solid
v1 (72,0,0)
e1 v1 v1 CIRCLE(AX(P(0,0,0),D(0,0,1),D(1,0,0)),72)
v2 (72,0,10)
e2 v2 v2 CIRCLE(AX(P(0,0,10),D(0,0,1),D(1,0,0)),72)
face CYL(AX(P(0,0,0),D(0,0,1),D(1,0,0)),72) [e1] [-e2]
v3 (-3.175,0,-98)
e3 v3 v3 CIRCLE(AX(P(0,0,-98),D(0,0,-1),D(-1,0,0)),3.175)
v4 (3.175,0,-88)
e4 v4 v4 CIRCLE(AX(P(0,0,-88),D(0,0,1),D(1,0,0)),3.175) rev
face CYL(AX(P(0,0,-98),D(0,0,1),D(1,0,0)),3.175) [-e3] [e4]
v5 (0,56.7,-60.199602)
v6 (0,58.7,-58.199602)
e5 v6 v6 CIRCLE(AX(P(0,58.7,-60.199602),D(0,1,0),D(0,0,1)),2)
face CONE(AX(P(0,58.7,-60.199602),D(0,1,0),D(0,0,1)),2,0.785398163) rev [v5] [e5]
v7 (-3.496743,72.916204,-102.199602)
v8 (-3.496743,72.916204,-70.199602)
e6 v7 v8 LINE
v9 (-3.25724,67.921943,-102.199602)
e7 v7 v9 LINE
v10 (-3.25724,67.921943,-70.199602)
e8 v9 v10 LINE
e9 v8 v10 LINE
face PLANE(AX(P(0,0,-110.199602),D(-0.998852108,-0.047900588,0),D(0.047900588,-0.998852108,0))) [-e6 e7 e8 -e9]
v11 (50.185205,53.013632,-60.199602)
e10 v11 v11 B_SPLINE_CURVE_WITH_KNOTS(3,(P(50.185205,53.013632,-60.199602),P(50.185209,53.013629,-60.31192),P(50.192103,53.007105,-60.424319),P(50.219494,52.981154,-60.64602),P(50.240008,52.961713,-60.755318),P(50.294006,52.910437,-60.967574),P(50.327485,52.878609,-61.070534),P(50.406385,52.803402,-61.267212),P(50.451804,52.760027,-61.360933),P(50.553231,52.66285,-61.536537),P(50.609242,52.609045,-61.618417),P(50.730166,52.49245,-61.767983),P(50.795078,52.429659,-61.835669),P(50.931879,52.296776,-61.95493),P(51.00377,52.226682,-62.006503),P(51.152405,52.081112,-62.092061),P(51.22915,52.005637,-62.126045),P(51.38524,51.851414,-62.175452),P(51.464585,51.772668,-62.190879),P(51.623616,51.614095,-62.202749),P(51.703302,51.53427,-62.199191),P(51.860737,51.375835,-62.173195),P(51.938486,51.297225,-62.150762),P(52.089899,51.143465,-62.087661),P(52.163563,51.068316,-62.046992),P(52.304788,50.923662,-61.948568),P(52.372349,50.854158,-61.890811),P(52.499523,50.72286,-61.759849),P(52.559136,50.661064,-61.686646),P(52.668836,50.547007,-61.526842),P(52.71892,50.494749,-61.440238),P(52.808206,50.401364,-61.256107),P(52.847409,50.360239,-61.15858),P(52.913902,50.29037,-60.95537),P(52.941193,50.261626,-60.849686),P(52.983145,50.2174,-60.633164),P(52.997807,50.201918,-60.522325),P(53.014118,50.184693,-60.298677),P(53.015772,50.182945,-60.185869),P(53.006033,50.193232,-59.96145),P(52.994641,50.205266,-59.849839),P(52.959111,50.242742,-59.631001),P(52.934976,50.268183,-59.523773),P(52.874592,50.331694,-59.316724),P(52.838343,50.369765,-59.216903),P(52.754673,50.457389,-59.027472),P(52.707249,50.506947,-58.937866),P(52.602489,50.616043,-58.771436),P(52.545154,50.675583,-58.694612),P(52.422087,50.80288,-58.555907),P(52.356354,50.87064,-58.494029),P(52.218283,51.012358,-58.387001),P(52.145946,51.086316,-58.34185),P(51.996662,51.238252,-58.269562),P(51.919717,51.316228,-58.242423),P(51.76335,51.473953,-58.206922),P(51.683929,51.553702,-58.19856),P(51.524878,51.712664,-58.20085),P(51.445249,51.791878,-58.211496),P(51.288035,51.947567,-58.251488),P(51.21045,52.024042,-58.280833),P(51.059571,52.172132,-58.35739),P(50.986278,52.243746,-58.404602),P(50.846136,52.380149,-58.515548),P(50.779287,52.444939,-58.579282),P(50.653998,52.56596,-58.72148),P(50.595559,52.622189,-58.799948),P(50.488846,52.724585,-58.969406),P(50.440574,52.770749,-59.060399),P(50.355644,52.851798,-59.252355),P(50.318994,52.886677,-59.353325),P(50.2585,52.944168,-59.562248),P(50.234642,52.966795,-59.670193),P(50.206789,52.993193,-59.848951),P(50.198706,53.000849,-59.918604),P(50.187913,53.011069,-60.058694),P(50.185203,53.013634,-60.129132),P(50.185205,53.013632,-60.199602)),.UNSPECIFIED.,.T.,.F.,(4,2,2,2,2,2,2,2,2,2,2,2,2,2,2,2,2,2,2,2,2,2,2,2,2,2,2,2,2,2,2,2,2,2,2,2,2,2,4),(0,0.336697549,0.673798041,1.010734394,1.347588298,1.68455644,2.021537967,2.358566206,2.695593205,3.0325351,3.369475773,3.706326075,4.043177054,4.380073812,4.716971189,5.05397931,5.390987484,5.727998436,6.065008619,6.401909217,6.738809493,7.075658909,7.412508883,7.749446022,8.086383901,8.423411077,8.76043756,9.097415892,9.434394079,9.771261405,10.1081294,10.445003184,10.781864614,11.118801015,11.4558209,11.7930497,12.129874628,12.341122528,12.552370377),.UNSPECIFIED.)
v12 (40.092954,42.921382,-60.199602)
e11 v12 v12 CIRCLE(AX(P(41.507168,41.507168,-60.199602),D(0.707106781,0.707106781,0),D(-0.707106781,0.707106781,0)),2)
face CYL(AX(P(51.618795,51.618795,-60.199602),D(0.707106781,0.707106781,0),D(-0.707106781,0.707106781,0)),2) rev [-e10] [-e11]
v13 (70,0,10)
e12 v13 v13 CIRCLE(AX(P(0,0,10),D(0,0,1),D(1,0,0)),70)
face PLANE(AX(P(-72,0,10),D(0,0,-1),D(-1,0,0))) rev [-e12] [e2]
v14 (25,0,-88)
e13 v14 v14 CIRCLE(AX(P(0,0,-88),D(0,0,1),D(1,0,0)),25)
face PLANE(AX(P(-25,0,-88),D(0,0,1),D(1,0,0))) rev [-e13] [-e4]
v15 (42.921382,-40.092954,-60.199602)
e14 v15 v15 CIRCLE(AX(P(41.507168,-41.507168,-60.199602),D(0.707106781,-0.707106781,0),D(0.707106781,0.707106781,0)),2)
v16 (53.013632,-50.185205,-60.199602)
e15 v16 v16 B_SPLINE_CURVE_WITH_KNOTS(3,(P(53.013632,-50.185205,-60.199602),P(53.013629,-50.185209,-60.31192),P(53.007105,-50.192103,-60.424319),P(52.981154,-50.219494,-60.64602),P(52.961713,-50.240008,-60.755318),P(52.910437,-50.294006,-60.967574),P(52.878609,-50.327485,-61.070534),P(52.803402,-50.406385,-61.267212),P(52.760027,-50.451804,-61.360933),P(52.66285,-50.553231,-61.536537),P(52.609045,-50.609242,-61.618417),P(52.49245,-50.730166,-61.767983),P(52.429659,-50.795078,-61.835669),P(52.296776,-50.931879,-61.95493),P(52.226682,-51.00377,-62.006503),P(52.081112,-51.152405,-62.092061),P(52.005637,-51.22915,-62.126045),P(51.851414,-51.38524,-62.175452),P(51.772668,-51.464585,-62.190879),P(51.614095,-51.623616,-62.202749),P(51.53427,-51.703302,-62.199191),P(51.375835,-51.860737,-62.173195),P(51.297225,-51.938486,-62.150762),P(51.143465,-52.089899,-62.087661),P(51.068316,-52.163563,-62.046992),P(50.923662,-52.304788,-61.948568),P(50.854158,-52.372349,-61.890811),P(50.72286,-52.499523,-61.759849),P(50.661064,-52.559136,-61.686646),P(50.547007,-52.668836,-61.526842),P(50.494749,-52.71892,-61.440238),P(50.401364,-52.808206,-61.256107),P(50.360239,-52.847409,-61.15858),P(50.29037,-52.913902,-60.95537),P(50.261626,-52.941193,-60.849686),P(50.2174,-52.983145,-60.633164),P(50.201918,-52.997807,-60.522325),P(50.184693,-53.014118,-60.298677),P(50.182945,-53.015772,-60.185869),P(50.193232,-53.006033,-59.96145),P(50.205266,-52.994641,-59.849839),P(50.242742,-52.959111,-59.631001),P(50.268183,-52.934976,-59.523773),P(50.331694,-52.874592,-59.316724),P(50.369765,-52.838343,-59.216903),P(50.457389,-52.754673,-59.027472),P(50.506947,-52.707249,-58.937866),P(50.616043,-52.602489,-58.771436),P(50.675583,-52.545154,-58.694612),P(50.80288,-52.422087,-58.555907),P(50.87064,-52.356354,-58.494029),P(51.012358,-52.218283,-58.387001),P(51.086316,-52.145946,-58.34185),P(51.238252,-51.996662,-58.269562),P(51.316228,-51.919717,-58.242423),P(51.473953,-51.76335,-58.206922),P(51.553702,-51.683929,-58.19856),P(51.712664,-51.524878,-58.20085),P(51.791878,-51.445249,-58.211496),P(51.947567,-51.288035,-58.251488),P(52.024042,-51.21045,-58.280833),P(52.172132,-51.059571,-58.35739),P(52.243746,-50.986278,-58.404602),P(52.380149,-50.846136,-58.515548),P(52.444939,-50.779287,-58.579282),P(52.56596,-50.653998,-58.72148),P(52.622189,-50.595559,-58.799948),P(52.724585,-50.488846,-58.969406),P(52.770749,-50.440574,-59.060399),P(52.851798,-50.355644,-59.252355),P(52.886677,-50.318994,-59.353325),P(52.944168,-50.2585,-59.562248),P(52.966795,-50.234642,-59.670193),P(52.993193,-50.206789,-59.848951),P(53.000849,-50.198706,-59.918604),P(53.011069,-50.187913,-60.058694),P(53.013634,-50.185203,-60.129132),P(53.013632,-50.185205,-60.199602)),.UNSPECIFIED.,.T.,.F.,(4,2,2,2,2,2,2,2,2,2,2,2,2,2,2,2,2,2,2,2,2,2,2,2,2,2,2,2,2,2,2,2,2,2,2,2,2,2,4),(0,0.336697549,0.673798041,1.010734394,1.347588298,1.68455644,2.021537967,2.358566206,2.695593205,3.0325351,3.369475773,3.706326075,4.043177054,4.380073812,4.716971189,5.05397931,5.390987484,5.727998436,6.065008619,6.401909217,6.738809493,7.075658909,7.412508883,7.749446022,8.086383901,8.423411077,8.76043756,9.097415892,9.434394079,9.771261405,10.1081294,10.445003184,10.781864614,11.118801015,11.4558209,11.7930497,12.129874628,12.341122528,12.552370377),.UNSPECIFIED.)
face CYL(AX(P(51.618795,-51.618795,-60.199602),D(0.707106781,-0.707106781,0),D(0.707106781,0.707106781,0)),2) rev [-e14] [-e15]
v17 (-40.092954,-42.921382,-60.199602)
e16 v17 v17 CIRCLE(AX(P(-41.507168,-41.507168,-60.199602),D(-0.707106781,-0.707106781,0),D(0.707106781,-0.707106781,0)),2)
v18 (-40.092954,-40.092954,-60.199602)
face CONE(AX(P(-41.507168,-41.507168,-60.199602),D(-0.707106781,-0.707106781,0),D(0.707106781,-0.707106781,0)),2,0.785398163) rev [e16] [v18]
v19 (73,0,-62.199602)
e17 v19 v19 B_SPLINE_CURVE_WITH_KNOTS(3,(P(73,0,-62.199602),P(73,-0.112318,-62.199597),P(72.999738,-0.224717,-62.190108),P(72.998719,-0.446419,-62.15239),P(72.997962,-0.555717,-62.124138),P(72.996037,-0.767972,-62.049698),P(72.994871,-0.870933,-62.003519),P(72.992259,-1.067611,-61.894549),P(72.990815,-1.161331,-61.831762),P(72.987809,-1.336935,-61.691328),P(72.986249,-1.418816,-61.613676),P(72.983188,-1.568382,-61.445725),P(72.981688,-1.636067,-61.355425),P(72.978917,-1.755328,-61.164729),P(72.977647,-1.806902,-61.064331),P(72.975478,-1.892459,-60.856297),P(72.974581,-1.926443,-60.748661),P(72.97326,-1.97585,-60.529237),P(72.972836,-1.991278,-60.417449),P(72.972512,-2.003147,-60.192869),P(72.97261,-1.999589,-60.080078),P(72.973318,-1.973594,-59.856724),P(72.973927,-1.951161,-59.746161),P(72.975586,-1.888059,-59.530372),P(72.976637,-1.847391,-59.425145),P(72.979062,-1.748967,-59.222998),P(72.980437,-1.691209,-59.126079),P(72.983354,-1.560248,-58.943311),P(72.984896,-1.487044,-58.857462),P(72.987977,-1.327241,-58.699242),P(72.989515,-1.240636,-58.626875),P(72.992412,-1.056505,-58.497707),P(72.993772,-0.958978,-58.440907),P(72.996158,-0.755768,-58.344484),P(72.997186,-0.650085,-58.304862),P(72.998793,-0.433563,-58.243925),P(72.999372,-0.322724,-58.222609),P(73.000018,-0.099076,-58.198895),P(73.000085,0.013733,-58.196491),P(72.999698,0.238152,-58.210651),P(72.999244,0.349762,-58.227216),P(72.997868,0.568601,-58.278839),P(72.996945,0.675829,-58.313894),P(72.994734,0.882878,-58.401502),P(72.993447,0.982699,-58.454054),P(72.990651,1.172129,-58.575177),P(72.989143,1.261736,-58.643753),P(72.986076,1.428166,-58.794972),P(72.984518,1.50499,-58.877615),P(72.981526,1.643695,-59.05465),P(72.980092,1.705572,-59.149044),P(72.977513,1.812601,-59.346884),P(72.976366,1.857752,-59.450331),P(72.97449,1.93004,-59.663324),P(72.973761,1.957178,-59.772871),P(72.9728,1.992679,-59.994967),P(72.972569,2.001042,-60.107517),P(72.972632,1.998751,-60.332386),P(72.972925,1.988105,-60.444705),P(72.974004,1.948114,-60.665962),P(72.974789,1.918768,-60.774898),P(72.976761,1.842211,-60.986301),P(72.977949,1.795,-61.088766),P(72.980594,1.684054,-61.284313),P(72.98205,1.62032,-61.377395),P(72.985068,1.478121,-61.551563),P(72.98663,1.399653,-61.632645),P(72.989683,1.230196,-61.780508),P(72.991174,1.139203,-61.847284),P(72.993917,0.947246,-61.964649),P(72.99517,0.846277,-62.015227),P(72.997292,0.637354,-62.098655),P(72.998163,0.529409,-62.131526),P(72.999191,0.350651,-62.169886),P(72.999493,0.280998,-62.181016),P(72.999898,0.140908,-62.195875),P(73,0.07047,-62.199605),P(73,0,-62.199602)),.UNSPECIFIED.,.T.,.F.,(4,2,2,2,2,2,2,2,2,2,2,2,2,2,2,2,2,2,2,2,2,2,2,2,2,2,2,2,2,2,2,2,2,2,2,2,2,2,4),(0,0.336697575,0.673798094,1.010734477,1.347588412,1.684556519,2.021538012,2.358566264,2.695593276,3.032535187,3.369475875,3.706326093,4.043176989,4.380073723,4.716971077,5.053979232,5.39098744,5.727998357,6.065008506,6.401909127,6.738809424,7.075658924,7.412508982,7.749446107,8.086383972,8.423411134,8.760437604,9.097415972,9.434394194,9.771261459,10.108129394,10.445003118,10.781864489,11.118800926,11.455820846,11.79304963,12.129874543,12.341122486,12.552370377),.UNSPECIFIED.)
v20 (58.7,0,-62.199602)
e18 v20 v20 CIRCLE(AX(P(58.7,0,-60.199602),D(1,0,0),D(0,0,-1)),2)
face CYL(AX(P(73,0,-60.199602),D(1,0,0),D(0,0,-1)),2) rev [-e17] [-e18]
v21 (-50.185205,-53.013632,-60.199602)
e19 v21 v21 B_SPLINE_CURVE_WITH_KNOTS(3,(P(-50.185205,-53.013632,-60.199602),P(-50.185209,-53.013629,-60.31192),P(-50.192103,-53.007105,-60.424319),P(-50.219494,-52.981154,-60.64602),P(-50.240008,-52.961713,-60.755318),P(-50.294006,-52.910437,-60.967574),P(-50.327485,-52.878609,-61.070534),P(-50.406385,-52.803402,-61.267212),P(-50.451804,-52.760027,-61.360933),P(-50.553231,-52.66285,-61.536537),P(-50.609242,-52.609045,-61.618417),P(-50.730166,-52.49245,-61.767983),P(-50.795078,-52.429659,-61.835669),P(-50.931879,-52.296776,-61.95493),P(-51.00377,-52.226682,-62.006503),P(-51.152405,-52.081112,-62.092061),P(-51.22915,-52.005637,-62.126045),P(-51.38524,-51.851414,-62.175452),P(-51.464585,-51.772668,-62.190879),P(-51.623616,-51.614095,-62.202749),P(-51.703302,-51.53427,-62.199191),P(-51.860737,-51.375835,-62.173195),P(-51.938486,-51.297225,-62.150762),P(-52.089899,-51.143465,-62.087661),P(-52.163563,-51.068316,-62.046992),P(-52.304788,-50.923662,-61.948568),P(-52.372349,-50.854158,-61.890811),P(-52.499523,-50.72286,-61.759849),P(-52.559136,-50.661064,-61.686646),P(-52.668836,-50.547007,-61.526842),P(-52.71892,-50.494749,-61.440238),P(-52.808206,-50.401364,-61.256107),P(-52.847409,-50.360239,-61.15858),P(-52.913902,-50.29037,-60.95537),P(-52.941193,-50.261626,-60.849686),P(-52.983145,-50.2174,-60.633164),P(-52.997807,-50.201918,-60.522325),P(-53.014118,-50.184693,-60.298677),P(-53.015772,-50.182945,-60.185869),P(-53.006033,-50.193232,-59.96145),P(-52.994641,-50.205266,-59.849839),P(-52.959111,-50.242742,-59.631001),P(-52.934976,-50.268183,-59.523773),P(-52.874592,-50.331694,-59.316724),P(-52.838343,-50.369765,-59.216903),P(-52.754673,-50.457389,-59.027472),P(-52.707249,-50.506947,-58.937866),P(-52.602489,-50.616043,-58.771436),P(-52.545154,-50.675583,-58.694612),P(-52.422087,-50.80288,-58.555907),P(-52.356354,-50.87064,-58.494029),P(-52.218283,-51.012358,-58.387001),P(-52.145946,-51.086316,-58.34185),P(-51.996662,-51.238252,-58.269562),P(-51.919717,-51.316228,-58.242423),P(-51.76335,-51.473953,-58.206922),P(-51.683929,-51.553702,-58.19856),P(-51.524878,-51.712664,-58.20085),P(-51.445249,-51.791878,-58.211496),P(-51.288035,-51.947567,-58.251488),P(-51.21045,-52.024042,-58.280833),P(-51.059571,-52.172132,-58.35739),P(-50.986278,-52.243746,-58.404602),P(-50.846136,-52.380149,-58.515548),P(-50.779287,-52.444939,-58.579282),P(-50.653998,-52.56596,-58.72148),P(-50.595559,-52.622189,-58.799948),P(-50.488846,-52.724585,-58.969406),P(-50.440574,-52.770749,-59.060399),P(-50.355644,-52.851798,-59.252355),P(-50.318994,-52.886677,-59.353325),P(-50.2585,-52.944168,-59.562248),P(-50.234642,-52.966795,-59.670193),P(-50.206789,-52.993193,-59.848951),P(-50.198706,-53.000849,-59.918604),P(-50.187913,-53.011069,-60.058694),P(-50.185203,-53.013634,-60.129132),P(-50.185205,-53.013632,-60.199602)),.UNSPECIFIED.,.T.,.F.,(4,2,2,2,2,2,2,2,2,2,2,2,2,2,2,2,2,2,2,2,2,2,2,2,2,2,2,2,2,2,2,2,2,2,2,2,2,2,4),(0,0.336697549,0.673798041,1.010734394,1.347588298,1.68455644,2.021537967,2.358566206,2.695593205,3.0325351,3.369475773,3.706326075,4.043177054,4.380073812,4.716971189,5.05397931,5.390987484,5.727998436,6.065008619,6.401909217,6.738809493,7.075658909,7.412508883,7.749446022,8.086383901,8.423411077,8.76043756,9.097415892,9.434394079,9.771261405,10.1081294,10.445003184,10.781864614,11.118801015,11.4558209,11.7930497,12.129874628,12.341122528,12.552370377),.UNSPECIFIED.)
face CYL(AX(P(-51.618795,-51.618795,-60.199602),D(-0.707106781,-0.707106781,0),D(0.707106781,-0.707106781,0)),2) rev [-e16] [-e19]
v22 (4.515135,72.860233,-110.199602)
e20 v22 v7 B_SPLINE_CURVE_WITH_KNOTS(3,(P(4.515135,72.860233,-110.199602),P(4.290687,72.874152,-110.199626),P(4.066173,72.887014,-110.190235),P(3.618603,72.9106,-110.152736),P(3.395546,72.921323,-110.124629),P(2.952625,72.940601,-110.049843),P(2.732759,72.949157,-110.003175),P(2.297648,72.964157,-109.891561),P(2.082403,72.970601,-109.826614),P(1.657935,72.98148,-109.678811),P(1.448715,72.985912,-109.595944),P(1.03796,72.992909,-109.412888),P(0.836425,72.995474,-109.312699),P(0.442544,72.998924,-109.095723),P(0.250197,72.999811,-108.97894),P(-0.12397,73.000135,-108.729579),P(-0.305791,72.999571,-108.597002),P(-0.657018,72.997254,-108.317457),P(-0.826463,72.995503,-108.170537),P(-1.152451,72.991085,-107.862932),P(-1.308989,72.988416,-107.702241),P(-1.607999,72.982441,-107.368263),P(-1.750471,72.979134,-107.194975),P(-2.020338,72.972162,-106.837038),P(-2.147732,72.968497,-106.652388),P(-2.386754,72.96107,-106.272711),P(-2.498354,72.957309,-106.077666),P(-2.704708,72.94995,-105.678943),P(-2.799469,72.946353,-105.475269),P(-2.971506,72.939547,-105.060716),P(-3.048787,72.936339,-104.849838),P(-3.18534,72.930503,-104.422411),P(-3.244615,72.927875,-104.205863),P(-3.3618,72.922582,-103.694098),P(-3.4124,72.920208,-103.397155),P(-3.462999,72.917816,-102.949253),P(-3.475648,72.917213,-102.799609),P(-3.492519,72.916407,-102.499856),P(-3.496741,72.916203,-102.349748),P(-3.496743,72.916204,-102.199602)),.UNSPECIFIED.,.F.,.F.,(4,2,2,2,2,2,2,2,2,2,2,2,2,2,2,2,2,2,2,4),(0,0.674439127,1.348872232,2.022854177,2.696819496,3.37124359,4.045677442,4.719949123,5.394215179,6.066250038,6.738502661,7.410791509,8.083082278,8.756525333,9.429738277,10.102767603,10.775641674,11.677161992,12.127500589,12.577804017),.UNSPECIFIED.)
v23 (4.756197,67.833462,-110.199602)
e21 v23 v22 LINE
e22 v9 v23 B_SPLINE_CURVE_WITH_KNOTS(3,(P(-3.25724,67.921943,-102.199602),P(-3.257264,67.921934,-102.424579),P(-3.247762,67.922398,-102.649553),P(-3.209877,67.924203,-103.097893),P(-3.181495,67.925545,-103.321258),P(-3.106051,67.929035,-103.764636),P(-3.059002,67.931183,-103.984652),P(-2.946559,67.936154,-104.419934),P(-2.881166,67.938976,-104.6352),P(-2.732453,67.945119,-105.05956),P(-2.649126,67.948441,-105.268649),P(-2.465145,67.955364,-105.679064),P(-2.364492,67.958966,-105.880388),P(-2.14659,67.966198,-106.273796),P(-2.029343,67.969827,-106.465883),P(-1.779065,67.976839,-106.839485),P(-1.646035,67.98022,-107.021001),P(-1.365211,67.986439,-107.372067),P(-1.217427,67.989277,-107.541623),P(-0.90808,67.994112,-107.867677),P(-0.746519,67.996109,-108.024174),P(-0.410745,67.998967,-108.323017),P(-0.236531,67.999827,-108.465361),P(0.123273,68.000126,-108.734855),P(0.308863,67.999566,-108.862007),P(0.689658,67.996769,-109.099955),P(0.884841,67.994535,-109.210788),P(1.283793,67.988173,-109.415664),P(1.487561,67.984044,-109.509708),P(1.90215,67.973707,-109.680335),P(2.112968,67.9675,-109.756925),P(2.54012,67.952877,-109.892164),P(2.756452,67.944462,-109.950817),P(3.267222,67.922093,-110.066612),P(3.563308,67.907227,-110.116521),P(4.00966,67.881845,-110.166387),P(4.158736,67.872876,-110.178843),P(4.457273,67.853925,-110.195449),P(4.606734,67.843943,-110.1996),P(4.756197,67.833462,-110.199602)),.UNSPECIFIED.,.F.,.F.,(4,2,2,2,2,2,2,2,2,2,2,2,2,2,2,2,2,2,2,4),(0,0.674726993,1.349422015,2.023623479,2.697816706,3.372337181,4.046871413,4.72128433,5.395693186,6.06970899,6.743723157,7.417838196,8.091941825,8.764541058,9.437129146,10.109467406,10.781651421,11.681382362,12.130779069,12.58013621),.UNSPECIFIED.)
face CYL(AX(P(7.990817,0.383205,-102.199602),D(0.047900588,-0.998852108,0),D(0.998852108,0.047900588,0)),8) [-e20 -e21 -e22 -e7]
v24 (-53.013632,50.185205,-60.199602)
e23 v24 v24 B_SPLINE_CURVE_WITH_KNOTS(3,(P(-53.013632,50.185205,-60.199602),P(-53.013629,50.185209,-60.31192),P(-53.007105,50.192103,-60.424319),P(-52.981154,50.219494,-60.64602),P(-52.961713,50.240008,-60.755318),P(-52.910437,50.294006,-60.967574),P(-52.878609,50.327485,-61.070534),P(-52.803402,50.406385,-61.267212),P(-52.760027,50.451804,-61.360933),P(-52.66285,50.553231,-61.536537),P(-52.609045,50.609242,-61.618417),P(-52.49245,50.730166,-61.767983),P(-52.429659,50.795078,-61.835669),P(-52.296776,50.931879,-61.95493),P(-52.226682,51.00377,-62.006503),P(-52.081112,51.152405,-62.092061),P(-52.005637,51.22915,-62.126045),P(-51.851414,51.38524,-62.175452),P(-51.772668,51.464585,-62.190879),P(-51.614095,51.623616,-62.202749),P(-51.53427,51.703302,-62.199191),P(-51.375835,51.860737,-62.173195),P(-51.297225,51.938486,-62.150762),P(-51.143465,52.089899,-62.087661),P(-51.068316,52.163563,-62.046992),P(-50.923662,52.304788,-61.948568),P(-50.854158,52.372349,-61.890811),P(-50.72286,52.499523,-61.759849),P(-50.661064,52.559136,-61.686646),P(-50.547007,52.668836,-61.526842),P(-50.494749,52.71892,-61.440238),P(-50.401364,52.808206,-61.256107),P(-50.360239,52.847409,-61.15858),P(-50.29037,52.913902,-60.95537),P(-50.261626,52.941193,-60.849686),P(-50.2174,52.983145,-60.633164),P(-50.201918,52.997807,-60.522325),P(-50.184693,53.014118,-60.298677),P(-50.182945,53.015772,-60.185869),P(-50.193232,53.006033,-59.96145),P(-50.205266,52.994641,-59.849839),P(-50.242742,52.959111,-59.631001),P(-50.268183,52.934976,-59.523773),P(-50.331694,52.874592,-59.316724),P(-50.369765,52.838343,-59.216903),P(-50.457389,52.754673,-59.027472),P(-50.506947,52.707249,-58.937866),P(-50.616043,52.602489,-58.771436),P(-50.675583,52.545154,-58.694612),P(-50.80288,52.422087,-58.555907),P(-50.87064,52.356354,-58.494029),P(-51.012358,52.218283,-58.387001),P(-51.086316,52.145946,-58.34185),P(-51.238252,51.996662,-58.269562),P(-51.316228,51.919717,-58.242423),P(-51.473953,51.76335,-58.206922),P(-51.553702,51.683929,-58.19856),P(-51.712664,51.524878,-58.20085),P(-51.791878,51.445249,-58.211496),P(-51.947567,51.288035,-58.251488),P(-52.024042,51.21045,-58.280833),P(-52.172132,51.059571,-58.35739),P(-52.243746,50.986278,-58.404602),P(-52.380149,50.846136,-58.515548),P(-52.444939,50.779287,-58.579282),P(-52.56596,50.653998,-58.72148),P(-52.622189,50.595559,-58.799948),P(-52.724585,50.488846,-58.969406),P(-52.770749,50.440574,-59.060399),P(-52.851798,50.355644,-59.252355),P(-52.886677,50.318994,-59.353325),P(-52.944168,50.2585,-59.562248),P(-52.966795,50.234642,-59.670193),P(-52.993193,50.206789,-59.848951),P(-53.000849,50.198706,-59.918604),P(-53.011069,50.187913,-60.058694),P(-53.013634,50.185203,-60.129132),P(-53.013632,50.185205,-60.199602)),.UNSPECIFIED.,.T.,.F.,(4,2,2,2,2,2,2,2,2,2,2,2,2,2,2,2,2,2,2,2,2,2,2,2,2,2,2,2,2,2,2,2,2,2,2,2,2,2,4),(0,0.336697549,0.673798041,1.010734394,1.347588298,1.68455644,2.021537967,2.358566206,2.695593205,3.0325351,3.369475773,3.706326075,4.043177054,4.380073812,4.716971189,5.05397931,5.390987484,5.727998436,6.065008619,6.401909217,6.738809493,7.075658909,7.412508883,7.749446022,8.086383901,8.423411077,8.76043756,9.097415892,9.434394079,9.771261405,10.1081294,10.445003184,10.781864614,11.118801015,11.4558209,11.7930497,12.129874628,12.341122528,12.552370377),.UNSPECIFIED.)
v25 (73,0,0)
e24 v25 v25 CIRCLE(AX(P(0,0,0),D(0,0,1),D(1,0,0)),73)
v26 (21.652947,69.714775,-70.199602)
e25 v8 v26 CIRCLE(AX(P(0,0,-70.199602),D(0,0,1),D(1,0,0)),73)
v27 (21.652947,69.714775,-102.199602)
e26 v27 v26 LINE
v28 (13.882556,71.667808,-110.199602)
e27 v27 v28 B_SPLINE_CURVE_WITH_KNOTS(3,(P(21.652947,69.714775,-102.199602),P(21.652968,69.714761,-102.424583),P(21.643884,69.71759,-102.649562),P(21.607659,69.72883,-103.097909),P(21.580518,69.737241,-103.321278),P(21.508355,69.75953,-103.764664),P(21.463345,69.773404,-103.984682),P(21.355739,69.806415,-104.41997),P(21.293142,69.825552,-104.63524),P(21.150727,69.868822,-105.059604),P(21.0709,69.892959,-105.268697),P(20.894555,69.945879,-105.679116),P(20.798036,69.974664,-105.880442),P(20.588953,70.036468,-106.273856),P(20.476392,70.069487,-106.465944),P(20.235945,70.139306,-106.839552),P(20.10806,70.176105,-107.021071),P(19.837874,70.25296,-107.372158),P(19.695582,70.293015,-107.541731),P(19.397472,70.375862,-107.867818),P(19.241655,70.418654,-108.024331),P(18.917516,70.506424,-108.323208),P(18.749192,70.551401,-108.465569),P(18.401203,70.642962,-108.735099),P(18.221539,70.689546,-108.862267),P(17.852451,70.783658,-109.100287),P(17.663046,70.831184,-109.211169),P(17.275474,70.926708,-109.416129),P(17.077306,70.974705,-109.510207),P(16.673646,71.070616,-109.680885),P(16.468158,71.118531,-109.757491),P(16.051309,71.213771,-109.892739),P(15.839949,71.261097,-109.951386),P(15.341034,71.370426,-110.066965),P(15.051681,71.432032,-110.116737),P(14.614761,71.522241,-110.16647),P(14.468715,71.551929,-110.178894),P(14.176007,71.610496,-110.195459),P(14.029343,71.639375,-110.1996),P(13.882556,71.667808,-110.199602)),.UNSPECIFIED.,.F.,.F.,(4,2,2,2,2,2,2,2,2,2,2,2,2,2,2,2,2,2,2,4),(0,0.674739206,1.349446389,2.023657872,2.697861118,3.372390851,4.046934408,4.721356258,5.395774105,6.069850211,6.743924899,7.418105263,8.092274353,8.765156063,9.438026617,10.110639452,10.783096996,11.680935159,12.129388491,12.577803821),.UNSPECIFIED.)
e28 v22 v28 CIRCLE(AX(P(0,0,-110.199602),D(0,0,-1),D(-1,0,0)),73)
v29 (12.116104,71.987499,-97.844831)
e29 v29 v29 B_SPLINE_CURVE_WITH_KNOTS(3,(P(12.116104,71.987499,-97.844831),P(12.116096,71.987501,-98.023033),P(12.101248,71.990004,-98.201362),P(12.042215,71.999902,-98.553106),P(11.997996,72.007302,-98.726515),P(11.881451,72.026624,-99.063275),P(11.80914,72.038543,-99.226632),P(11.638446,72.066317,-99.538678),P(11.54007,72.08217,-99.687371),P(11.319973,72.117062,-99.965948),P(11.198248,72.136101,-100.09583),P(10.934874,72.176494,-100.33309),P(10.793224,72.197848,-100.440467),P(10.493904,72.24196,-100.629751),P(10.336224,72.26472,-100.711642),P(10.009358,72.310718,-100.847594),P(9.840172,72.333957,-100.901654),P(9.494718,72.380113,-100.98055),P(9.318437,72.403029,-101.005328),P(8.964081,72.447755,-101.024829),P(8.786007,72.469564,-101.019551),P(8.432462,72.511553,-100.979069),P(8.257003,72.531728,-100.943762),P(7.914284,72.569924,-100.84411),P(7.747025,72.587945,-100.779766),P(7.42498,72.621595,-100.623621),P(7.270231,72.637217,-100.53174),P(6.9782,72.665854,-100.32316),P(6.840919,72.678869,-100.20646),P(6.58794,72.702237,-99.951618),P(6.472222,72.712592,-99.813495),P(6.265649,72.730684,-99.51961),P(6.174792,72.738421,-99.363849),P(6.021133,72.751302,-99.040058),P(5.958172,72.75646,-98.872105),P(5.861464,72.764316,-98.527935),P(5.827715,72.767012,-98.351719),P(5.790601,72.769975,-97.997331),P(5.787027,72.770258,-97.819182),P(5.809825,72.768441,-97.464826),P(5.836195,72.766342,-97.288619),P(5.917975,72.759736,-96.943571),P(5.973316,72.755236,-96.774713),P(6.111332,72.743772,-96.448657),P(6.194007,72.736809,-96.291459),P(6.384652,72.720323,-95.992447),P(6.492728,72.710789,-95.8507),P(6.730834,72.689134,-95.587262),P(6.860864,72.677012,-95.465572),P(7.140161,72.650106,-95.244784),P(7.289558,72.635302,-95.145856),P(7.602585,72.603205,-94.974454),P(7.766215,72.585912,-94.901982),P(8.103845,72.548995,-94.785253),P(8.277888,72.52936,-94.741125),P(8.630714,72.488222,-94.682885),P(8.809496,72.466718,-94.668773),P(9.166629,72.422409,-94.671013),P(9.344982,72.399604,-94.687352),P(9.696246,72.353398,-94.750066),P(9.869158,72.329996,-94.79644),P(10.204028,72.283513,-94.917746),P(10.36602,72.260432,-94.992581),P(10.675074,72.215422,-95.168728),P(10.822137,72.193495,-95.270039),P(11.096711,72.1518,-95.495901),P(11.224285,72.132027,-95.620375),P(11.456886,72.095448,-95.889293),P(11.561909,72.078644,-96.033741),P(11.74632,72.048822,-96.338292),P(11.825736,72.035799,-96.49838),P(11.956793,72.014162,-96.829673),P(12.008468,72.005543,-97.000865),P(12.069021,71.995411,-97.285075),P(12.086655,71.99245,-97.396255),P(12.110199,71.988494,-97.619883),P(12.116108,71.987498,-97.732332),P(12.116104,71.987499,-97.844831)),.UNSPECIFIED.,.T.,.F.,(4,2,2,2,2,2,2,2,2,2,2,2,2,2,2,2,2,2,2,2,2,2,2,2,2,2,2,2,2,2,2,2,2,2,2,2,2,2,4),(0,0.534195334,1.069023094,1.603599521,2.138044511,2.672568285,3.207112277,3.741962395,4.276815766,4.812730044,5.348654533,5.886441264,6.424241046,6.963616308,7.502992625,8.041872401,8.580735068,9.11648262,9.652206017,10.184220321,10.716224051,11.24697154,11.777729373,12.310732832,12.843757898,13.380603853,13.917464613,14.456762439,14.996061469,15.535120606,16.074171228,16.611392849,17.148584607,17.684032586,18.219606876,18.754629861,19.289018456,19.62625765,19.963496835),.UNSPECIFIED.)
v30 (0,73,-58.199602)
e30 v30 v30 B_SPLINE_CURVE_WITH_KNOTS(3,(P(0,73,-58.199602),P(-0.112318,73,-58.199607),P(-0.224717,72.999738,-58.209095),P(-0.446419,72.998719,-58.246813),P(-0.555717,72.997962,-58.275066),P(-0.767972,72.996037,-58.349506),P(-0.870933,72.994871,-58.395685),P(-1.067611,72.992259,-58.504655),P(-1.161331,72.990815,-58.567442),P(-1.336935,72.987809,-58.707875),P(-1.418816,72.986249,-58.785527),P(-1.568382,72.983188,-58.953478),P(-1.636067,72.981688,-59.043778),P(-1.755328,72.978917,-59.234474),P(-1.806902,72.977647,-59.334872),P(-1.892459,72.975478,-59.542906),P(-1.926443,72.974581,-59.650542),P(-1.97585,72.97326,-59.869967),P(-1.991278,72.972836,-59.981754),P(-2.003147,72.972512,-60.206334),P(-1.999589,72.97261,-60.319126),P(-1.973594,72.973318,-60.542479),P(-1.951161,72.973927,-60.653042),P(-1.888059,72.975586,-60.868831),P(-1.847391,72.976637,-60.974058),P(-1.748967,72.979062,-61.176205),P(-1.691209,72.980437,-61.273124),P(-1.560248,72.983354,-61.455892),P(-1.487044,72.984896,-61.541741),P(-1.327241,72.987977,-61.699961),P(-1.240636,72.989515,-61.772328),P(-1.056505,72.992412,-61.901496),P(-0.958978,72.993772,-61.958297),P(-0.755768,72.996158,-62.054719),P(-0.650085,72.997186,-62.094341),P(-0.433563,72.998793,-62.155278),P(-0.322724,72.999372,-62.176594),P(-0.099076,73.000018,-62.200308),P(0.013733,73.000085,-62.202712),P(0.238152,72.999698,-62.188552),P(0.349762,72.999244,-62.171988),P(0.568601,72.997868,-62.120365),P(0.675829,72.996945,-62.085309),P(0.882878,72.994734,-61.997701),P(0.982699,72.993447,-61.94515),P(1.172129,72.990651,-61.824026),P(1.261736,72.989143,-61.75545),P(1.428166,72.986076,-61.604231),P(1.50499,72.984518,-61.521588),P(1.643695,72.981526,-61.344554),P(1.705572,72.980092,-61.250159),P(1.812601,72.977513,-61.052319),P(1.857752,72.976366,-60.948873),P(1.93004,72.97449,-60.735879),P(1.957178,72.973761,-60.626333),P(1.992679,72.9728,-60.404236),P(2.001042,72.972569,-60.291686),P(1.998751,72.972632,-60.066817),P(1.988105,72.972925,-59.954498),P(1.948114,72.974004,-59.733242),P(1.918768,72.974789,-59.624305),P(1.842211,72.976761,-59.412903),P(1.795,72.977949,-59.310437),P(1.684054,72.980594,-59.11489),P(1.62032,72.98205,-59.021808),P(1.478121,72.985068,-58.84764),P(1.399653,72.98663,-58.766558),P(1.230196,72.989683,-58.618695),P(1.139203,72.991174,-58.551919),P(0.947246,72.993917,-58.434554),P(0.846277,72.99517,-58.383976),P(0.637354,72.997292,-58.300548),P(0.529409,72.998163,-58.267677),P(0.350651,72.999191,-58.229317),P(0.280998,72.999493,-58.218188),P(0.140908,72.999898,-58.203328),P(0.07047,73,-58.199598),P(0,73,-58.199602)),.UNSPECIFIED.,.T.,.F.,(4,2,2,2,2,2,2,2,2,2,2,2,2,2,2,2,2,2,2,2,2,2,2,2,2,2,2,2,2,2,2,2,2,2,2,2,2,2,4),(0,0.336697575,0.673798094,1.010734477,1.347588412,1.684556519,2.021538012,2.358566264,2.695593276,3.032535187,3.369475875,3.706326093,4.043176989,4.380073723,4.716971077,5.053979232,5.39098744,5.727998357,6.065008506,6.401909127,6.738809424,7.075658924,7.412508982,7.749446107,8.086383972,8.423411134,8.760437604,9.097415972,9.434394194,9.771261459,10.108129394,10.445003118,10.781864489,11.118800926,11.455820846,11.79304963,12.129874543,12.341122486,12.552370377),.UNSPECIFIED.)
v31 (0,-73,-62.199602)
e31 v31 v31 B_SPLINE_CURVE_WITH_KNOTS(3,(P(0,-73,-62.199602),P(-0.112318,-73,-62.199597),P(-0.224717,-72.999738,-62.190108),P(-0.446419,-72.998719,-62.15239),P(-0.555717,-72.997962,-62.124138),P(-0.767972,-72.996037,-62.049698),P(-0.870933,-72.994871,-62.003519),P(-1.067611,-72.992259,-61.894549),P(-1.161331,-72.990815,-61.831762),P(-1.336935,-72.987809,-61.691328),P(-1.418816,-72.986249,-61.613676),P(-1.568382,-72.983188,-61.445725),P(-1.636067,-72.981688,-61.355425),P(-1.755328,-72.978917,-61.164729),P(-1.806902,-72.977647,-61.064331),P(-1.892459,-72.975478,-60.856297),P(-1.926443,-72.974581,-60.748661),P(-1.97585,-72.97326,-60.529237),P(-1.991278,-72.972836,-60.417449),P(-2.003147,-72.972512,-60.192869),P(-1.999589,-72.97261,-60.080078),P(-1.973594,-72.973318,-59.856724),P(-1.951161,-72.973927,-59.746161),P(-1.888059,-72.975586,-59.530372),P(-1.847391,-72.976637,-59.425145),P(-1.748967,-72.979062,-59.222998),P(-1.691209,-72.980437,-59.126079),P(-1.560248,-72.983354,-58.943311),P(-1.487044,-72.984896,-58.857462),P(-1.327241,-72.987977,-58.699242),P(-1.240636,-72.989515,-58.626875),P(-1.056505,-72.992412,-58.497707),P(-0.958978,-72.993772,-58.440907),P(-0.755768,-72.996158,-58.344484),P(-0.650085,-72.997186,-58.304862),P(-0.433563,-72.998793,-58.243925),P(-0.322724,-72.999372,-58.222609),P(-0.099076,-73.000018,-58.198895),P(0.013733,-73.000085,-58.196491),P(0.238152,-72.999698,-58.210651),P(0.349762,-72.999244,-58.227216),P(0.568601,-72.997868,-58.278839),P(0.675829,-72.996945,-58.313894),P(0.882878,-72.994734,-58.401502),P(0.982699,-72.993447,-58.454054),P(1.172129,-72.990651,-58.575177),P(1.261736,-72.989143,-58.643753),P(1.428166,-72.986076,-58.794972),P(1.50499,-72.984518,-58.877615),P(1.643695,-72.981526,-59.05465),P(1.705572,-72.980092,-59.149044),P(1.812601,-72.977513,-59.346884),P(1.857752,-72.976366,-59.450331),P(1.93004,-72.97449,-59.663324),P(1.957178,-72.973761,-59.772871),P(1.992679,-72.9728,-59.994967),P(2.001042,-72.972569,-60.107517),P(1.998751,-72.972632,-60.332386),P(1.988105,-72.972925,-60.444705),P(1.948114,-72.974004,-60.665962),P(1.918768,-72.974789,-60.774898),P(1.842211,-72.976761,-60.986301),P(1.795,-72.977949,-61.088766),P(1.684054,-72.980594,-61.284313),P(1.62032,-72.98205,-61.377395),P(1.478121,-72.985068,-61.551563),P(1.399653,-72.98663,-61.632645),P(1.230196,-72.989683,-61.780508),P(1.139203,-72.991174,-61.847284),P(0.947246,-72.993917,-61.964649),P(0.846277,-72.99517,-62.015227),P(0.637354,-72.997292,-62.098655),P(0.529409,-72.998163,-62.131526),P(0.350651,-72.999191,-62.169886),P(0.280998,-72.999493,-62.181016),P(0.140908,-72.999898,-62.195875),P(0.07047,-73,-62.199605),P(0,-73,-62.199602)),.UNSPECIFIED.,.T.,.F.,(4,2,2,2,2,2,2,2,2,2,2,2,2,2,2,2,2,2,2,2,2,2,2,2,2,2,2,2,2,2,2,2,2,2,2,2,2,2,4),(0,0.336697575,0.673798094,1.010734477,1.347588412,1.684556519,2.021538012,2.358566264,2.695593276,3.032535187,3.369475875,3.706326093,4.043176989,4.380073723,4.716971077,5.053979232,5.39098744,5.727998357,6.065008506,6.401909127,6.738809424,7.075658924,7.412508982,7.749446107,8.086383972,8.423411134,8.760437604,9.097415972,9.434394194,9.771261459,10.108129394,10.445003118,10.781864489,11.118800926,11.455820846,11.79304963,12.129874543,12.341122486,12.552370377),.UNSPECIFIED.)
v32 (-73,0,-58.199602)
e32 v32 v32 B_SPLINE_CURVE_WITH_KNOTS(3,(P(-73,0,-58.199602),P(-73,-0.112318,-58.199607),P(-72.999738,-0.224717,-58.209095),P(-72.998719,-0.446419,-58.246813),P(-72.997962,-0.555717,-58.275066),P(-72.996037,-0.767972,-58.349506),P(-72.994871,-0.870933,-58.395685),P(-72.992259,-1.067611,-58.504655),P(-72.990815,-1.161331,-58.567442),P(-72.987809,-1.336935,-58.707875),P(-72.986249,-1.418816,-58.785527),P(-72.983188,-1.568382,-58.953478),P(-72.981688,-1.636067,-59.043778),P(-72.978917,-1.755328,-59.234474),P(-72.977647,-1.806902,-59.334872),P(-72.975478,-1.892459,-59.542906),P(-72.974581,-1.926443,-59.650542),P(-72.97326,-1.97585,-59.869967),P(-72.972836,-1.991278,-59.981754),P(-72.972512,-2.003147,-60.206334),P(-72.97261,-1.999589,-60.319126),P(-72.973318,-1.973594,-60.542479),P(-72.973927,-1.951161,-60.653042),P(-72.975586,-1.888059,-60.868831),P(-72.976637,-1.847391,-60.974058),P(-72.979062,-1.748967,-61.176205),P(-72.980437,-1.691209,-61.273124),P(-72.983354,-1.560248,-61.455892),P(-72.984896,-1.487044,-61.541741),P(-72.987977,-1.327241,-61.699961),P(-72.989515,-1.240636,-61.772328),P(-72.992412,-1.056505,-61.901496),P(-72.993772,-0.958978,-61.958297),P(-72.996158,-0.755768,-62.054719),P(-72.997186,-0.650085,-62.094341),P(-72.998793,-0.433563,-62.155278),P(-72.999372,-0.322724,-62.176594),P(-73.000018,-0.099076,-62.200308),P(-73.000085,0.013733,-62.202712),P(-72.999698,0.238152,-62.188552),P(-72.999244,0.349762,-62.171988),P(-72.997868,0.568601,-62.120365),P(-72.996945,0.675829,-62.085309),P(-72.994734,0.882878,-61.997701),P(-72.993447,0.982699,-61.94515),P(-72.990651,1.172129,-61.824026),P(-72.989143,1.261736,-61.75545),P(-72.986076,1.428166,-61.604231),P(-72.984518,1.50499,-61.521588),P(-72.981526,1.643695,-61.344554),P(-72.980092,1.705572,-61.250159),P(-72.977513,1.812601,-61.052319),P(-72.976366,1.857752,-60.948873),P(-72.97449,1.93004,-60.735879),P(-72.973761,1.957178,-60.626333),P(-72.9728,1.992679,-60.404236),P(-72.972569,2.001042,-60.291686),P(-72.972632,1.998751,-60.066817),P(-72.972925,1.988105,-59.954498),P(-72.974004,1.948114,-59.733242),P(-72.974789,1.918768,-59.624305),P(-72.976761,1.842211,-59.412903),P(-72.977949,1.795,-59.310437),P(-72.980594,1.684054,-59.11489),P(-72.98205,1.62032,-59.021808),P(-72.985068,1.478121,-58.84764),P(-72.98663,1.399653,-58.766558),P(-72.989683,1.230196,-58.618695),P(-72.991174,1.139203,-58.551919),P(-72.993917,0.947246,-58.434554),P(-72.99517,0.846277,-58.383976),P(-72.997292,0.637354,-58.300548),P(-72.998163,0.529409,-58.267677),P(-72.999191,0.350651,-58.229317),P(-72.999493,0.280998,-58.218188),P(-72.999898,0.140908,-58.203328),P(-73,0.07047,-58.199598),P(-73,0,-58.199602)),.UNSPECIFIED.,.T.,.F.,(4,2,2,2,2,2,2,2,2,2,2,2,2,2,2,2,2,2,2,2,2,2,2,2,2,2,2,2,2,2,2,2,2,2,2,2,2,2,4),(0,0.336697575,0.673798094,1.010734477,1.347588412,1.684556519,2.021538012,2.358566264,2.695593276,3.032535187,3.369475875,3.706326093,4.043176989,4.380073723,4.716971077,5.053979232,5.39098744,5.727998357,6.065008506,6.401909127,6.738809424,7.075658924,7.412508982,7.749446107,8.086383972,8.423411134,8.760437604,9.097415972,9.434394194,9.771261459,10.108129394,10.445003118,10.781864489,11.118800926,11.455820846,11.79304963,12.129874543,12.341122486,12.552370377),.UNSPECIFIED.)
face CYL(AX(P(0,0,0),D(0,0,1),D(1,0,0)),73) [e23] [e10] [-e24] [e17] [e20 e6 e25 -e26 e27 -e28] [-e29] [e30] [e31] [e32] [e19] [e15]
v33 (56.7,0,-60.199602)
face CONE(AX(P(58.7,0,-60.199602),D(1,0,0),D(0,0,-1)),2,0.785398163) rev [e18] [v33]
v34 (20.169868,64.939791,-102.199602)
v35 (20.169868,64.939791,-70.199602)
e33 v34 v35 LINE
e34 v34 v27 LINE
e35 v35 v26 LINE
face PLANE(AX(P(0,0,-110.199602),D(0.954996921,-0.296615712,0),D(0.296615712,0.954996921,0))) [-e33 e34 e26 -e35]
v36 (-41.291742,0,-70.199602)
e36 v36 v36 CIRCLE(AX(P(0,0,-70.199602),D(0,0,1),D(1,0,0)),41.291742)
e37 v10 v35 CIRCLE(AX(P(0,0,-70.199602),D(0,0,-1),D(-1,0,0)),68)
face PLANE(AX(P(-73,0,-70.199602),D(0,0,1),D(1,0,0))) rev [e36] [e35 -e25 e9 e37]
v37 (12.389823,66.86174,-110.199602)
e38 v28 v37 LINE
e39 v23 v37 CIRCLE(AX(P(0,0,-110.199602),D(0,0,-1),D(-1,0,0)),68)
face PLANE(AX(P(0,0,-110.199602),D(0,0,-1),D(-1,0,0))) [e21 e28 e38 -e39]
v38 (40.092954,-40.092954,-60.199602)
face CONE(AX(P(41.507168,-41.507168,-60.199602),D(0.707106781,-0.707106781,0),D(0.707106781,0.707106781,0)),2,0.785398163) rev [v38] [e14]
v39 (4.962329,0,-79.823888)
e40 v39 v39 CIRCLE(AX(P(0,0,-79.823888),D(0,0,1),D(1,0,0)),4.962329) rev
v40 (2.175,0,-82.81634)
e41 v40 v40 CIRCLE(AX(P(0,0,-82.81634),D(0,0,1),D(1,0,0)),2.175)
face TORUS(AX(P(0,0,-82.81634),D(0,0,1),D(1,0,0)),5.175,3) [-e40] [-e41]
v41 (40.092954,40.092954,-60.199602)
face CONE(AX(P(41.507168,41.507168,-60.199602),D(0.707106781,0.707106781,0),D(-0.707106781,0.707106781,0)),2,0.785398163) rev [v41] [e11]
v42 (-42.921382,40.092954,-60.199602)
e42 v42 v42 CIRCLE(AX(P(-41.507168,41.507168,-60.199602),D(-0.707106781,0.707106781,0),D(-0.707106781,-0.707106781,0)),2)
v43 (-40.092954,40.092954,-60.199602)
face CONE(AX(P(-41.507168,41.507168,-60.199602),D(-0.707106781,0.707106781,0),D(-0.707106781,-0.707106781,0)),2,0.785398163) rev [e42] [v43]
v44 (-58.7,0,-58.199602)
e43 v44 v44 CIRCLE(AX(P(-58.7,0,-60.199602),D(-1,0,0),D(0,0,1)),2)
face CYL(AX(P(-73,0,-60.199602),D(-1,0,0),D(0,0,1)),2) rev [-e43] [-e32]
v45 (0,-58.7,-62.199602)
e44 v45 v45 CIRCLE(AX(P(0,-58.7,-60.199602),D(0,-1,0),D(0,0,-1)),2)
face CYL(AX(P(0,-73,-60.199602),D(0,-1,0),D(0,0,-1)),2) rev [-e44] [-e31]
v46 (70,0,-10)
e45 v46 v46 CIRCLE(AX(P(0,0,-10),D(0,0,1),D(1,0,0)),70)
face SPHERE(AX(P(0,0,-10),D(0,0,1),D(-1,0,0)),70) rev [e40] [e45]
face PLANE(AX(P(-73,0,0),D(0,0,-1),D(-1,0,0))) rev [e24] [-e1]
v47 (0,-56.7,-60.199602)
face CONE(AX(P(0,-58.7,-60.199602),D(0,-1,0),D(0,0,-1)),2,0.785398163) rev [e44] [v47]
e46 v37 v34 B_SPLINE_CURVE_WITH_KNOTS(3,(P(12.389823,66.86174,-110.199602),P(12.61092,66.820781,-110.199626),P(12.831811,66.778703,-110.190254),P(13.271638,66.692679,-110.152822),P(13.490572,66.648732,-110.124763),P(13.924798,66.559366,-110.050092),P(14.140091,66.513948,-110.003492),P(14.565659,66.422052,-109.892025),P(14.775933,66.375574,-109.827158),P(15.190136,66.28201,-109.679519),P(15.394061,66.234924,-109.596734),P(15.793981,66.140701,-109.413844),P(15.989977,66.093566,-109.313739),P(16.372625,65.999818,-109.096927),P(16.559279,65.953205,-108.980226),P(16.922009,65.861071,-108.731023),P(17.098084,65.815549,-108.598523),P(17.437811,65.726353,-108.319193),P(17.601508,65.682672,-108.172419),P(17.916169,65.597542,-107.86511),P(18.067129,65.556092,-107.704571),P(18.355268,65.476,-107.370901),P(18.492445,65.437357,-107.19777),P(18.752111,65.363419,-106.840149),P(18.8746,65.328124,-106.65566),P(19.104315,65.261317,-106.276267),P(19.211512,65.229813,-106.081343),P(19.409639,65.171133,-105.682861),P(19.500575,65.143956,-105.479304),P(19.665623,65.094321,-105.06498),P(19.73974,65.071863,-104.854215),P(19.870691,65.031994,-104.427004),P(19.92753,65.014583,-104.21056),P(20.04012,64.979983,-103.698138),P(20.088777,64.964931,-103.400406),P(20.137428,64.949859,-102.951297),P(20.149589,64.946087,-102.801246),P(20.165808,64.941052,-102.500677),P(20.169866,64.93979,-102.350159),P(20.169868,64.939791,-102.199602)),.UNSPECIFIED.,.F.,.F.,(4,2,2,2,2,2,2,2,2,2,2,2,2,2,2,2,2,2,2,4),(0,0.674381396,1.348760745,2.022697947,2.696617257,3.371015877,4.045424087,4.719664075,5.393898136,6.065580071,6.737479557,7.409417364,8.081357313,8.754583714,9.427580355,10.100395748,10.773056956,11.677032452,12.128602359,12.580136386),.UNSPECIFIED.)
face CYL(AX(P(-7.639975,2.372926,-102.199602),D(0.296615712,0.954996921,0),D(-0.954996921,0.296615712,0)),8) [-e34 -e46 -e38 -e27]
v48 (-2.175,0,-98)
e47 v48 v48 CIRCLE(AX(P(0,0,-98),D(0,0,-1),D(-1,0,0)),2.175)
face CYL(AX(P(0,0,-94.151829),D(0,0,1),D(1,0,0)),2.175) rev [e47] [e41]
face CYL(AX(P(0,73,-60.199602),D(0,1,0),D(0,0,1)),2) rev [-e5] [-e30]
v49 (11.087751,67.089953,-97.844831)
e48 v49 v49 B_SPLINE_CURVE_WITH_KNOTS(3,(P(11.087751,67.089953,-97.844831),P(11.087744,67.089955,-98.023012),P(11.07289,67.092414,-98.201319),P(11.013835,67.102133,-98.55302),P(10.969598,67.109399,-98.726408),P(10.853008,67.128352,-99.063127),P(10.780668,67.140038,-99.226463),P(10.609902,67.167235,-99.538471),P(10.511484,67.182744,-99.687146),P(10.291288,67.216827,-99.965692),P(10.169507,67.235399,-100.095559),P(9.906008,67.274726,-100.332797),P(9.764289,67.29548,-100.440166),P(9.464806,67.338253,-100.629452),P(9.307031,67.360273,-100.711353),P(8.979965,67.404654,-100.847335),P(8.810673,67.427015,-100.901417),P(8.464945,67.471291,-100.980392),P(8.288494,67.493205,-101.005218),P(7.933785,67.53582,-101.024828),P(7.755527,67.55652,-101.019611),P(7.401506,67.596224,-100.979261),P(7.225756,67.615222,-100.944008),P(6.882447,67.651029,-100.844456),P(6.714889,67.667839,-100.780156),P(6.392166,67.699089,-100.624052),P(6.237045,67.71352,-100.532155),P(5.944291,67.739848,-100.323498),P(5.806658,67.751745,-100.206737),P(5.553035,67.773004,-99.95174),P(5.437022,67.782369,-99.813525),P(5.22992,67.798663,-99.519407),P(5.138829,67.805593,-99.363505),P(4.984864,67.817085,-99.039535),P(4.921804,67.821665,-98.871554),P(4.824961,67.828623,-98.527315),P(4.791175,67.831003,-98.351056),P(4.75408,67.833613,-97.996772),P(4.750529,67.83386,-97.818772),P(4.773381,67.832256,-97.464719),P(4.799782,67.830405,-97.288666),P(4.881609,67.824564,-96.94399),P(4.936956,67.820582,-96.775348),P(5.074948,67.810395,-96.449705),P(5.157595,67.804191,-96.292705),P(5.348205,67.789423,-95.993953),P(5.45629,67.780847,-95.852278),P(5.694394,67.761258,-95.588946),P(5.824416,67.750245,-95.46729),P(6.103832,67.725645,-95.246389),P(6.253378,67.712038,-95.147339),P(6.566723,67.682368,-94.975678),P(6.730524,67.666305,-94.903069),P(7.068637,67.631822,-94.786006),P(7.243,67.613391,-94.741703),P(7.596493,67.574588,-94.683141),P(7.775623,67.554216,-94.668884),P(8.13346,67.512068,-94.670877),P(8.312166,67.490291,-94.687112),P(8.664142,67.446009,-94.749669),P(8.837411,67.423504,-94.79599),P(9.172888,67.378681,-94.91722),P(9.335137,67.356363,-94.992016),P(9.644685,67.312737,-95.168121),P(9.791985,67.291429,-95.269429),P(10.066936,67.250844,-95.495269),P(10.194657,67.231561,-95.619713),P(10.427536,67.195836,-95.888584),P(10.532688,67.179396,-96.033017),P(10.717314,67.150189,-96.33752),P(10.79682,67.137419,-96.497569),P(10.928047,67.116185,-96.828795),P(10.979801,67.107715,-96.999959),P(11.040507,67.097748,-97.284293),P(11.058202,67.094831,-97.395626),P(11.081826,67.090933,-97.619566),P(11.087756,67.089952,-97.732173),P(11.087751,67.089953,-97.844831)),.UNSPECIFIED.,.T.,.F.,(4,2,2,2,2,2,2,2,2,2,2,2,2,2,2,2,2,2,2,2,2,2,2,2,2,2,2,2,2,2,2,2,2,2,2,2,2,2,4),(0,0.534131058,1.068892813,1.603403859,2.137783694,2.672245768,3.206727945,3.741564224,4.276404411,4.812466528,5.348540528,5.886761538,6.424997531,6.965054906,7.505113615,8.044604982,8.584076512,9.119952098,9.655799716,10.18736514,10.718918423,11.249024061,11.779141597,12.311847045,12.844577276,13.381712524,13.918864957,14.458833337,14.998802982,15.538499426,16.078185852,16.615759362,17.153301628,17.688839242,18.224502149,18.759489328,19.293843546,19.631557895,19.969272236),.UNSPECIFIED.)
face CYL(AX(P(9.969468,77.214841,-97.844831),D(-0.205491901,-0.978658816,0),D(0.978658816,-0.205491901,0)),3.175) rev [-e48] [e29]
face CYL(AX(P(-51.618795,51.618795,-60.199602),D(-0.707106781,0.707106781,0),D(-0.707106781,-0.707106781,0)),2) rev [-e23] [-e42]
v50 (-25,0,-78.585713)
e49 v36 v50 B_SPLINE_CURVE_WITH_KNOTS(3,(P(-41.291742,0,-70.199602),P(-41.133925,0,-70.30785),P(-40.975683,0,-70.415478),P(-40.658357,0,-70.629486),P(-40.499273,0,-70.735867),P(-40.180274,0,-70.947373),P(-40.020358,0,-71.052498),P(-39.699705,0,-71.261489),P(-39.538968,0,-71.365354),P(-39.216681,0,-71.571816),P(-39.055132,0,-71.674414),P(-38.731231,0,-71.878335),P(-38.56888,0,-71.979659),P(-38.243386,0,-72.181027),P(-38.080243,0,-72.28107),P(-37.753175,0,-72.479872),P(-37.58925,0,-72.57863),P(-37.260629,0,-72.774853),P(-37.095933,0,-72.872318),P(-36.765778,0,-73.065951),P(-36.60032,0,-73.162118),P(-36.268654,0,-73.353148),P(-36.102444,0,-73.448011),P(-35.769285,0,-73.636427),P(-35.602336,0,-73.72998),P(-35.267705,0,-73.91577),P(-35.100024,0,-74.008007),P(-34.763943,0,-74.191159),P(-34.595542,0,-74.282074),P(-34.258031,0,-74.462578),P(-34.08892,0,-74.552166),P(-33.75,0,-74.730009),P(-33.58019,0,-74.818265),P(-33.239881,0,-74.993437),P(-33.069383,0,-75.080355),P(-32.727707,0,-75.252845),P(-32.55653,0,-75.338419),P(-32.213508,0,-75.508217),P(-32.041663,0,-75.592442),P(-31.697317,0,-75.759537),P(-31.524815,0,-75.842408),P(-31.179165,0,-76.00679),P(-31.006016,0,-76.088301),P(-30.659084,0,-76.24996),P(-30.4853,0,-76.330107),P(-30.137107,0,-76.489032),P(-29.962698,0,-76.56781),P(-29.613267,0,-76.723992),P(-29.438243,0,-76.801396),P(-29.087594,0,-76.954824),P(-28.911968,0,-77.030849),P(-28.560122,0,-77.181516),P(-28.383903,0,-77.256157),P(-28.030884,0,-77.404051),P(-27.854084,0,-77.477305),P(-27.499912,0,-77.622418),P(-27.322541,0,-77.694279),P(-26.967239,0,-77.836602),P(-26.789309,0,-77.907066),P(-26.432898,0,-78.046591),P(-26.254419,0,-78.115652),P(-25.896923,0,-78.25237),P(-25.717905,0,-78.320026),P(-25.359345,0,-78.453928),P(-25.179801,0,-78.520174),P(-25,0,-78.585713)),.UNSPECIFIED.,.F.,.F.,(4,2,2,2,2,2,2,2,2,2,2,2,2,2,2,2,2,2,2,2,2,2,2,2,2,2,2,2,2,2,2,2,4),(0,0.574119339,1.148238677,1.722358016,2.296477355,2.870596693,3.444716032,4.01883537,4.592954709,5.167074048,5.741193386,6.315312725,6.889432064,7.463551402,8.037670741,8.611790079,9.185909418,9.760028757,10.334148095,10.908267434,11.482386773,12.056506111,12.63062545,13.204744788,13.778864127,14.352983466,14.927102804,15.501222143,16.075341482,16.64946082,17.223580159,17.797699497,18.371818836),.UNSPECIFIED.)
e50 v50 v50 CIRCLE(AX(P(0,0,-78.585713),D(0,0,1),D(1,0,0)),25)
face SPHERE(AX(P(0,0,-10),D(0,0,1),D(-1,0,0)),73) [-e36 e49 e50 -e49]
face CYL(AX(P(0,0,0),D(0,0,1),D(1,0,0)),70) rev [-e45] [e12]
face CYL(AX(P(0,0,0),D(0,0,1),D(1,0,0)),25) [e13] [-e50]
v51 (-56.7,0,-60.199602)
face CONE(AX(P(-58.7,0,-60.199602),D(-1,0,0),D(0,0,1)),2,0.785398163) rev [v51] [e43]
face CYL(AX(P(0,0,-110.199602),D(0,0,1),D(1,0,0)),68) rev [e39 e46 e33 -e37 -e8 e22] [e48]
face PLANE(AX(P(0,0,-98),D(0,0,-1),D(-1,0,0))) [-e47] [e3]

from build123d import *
from build123d.topology import SkipClean

# Parameters (mm, degrees)
CIRPATTERN1_COUNT            = 8
SKETCH55_R                   = 2.175
CUT_EXTRUDE37_DEPTH          = 17.800398408
SCHIZZO1_R                   = 3.175
SCHIZZO1_R_2                 = 2.175
ESTRUSIONE_ESTRUSIONE1_DEPTH = 10
ESTRUSIONE_ESTRUSIONE2_START = 40
ESTRUSIONE_ESTRUSIONE2_DEPTH = 40
RACCORDO1_R                  = 8
SCHIZZO3_R                   = 3.175
TAGLIO_ESTRUSIONE1_DEPTH     = 14


with BuildPart() as part:
    # Sketch18 → Revolve1 (revolve)
    with BuildSketch(Plane(origin=(0, 0, 0), x_dir=(1, 0, 0), z_dir=(0, 1, 0)), mode=Mode.PRIVATE) as revolve1_sk:
        with BuildLine():
            Line((0, 88), (0, 80))
            ThreePointArc((0, 80), (-49.497474683, 59.497474683), (-70, 10))
            Line((-70, 10), (-70, -10))
            Line((-70, -10), (-72, -10))
            Line((-72, -10), (-72, 0))
            Line((-72, 0), (-73, 0))
            Line((-73, 0), (-73, 10))
            Line((-73, 10), (-73, 70.199601592))
            Line((-73, 70.199601592), (-41.29174213, 70.199601592))
            ThreePointArc((-41.29174213, 70.199601592), (-33.410035677, 74.90585117), (-25, 78.585712798))
            Line((-25, 78.585712798), (-25, 88))
            Line((-25, 88), (0, 88))
        make_face()
    revolve(revolve1_sk.sketch.rotate(Axis((0, 0, 0), (0, 0, -1)), 180), axis=Axis((0, 0, 0), (0, 0, -1)))

    # Sketch23 → Ø4.0 (4) Diameter Hole1 (revolve, cut)
    with BuildSketch(Plane(origin=(0, 73, -60.199601592), x_dir=(0, 0, 1), z_dir=(1, 0, 0))):
        Polygon((0, 0), (0, 16.3), (2, 14.3), (2, 0), align=None)
    f_4_0_4_diameter_hole1 = revolve(axis=Axis((0, 79.35, -60.199601592), (0, -1, 0)), mode=Mode.SUBTRACT)

    # CirPattern1: Ø4.0 (4) Diameter Hole1 ×8 about axis
    cirpattern1_axis = Axis((0, 0, 0), (0, 0, -1))
    for i in range(1, CIRPATTERN1_COUNT):
        add(f_4_0_4_diameter_hole1.rotate(cirpattern1_axis, i * 360 / CIRPATTERN1_COUNT), mode=Mode.SUBTRACT)

    # Sketch55 → Cut-Extrude37 (cut)
    with BuildSketch(Plane(origin=(0, 0, -70.199601592), x_dir=(-1, 0, 0), z_dir=(0, 0, -1))):
        with Locations(Location((0, 0, 0), (0, 0, 180))):
            Circle(SKETCH55_R)
    extrude(amount=CUT_EXTRUDE37_DEPTH, mode=Mode.SUBTRACT)

    # Fillet8: read off the stored shape, not the designer's step
    # Fillet8 outline → Fillet8 (revolve, cut)
    with BuildSketch(Plane.XZ):
        with BuildLine():
            ThreePointArc((2.175, -82.816340027), (2.979776356, -80.771592329), (4.962328767, -79.823887698))
            Line((4.962328767, -79.823887698), (2.175, -79.823887698))
            Line((2.175, -79.823887698), (2.175, -82.816340027))
        make_face()
    revolve(axis=Axis((0, 0, 0), (0, 0, 1)), mode=Mode.SUBTRACT)

    # Schizzo1 → Estrusione-Estrusione1 (add)
    with BuildSketch(Plane(origin=(0, 0, -88), x_dir=(-1, 0, 0), z_dir=(0, 0, -1))):
        with Locations(Location((0, 0, 0), (0, 0, 180))):
            Circle(SCHIZZO1_R)
        with Locations(Location((0, 0, 0), (0, 0, 180))):
            Circle(SCHIZZO1_R_2, mode=Mode.SUBTRACT)
    extrude(amount=ESTRUSIONE_ESTRUSIONE1_DEPTH)

    # Schizzo2 → Estrusione-Estrusione2 (add)
    with BuildSketch(Plane(origin=(0, 0, -70.199601592), x_dir=(-1, 0, 0), z_dir=(0, 0, -1)).offset(ESTRUSIONE_ESTRUSIONE2_START)):
        with BuildLine():
            ThreePointArc((3.496742934, 72.916203884), (-2.871629137, 72.943496942), (-9.218146375, 72.415645943))
            Line((-9.218146375, 72.415645943), (-8.586766487, 67.455670194))
            ThreePointArc((-8.586766487, 67.455670194), (-2.674942209, 67.947367014), (3.257239993, 67.921943344))
            Line((3.257239993, 67.921943344), (3.496742934, 72.916203884))
        make_face()
        with BuildLine():
            Line((-8.586766487, 67.455670194), (-9.218146375, 72.415645943))
            ThreePointArc((-9.218146375, 72.415645943), (-15.494507954, 71.336668154), (-21.652946971, 69.714775245))
            Line((-21.652946971, 69.714775245), (-20.169868412, 64.939790639))
            ThreePointArc((-20.169868412, 64.939790639), (-14.433240286, 66.450594992), (-8.586766487, 67.455670194))
        make_face()
    extrude(amount=-ESTRUSIONE_ESTRUSIONE2_DEPTH)

    # Raccordo1
    raccordo1_edges = [part.edges().sort_by_distance(p)[0] for p in [
        (20.911407692, 67.327282942, -110.199601592),
        (-3.376991464, 70.419073614, -110.199601592),
    ]]
    fillet(raccordo1_edges, radius=RACCORDO1_R)

    # Schizzo3 → Taglio-Estrusione1 (cut)
    with SkipClean():  # the faces are left unmerged after this step: merging them gives an invalid solid
        with BuildSketch(Plane(origin=(13.072496691, 62.257996798, 0), x_dir=(0.978658816176937, -0.20549190134688128, 0), z_dir=(0.2054919013468813, 0.9786588161769371, 0))):
            with Locations((-6.110316561, 97.844831396)):
                Circle(SCHIZZO3_R)
        extrude(amount=TAGLIO_ESTRUSIONE1_DEPTH, mode=Mode.SUBTRACT)


solid = part.part
